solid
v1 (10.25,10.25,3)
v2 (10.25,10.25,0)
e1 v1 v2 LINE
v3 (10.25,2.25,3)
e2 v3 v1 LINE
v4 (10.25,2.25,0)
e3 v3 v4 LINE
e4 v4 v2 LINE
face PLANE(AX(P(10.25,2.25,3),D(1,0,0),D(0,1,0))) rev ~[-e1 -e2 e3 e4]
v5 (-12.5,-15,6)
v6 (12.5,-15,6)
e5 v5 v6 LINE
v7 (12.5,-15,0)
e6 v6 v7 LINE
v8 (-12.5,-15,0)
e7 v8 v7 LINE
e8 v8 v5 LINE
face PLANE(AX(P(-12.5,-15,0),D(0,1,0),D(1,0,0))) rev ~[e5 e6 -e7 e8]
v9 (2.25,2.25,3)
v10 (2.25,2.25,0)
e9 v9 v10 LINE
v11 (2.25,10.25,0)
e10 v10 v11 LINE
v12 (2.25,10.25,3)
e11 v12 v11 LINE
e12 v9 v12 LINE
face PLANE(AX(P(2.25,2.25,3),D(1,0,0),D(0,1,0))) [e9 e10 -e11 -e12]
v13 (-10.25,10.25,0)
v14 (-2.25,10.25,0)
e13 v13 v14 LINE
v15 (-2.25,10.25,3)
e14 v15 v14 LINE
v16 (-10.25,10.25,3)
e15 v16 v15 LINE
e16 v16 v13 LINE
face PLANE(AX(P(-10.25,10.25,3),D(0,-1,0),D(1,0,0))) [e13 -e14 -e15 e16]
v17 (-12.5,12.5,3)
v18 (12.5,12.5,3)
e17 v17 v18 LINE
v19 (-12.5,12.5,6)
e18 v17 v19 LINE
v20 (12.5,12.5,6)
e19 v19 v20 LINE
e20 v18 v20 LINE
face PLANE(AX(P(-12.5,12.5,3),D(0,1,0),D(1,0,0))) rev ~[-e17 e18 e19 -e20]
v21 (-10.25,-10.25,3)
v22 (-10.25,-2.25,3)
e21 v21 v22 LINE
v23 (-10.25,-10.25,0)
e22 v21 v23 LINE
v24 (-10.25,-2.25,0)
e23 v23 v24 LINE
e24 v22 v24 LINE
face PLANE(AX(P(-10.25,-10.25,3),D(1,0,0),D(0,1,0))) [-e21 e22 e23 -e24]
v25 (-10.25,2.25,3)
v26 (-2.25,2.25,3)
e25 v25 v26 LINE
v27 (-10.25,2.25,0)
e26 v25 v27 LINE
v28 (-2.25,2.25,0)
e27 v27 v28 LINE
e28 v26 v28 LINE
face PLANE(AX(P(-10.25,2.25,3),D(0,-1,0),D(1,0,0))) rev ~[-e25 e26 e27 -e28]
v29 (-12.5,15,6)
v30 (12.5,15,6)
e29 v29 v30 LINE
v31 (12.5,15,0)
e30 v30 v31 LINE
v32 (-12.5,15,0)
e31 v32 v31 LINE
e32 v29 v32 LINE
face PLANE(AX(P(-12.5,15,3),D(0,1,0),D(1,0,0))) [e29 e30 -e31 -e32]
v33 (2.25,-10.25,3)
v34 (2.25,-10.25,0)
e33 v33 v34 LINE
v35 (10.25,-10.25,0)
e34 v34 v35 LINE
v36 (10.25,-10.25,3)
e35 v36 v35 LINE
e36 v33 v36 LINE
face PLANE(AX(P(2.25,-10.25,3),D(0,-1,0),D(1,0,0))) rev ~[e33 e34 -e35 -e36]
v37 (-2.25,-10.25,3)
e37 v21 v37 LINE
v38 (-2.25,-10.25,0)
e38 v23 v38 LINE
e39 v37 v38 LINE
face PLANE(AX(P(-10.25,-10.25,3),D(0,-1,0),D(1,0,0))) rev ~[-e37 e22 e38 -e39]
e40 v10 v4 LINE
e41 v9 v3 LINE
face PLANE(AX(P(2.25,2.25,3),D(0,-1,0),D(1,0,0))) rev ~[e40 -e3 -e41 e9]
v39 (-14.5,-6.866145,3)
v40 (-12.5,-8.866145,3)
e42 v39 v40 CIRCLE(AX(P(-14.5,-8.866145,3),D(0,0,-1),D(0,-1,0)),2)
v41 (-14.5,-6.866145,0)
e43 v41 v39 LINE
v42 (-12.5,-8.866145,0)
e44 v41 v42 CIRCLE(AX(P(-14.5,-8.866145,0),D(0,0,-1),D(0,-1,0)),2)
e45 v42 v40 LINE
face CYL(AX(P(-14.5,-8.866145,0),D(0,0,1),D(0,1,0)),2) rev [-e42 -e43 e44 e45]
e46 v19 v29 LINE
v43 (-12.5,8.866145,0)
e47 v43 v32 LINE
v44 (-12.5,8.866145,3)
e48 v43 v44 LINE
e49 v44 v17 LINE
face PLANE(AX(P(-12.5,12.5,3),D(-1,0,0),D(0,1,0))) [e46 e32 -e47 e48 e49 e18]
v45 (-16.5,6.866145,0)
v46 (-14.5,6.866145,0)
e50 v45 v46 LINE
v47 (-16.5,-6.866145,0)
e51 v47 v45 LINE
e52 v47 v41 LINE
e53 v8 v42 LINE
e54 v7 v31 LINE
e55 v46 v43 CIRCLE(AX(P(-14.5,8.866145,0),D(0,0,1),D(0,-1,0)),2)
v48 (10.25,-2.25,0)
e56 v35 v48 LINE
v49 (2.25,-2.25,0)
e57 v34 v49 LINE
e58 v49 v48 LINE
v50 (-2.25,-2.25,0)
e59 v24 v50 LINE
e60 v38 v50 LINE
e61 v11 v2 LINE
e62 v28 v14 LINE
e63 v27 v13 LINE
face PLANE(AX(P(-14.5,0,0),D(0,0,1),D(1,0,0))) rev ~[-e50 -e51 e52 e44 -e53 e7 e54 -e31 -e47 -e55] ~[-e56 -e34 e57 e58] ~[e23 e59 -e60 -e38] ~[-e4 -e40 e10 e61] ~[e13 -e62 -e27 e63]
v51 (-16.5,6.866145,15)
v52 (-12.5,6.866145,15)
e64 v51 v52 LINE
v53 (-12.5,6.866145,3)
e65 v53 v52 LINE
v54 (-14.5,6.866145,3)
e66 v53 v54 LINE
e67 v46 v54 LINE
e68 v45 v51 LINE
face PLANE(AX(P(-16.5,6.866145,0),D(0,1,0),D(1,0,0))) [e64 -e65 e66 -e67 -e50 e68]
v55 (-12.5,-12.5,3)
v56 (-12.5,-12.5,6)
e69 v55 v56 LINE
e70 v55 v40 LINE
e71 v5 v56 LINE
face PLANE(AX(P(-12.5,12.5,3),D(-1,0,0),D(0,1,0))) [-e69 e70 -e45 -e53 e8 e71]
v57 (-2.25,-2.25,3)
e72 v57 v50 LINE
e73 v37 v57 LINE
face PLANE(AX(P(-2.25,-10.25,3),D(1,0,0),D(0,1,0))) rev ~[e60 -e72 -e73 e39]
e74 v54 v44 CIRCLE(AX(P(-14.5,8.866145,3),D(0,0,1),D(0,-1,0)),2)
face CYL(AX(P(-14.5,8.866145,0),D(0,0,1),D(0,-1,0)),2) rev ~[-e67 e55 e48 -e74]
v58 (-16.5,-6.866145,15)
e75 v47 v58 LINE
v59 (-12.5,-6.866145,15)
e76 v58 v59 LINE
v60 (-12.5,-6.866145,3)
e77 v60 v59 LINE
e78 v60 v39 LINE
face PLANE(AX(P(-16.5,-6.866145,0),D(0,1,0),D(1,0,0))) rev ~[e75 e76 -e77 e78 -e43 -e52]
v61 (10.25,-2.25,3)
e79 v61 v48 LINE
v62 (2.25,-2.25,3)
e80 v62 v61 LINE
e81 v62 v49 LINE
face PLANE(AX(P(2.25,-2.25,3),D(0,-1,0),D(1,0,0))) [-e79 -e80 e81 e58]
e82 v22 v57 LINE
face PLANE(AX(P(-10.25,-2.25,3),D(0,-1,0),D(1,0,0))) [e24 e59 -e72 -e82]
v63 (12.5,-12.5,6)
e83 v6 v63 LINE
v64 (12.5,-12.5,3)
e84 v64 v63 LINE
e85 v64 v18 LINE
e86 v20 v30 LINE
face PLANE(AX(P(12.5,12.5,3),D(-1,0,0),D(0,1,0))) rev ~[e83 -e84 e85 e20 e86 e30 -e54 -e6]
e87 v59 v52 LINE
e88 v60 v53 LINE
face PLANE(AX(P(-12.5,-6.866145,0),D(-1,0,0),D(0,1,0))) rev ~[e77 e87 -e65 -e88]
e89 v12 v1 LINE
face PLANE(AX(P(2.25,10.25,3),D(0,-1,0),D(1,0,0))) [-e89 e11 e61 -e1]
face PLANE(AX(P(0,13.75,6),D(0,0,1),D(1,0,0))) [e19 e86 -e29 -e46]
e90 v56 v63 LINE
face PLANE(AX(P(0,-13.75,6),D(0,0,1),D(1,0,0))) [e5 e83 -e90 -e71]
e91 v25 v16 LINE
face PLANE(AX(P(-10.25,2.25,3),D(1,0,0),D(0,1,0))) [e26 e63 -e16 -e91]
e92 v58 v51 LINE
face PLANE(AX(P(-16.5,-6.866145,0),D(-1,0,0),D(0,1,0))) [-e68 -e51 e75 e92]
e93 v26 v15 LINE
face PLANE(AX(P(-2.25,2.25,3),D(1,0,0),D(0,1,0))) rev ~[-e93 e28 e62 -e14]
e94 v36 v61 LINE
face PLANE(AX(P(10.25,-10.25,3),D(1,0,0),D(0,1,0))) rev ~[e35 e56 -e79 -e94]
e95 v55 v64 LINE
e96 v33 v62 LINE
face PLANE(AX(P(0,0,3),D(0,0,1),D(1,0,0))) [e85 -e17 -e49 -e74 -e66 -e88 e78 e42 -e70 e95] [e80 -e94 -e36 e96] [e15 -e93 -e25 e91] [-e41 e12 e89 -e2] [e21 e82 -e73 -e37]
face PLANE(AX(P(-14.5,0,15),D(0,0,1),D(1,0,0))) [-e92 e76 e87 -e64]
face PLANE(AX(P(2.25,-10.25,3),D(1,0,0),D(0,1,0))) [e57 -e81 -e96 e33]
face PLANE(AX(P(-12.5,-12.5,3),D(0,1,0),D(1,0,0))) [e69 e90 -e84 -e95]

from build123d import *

# Parameters (mm, degrees)
F0_W     = 25
F0_H     = 30
F1_DEPTH = 3
F2_W     = 25
F2_H     = 2.5
F3_DEPTH = 3
F4_W     = 4
F4_H     = 13.7322908992
F5_DEPTH = 15
F6_R     = 2
F7_W     = 8
F7_H     = 8
F8_DEPTH = 3


with BuildPart() as f1:
    # F0 (on Top) → F1 (new body)
    with BuildSketch(Plane.XY):
        Rectangle(F0_W, F0_H)
    extrude(amount=F1_DEPTH)

    # F2 (on face) → F3 (join)
    with BuildSketch(Plane.XY.offset(3)):
        with Locations((0, 13.75)):
            Rectangle(F2_W, F2_H)
        with Locations((0, -13.75)):
            Rectangle(F2_W, F2_H)
    extrude(amount=F3_DEPTH)

    # F4 (on Top) → F5 (join)
    with BuildSketch(Plane.XY):
        with Locations((-14.5, 0)):
            Rectangle(F4_W, F4_H)
    extrude(amount=F5_DEPTH)

    # F6
    f6_edges = [f1.edges().sort_by_distance(p)[0] for p in [
        (-12.5, -6.866145, 1.5),
        (-12.5, 6.866145, 1.5),
    ]]
    fillet(f6_edges, radius=F6_R)

    # F7 (on face) → F8 (cut)
    with BuildSketch(Plane.XY.offset(3)):
        with Locations((-6.25, 6.25)):
            Rectangle(F7_W, F7_H)
        with Locations((6.25, 6.25)):
            Rectangle(F7_W, F7_H)
        with Locations((-6.25, -6.25)):
            Rectangle(F7_W, F7_H)
        with Locations((6.25, -6.25)):
            Rectangle(F7_W, F7_H)
    extrude(amount=-F8_DEPTH, mode=Mode.SUBTRACT)


solid = f1.part
